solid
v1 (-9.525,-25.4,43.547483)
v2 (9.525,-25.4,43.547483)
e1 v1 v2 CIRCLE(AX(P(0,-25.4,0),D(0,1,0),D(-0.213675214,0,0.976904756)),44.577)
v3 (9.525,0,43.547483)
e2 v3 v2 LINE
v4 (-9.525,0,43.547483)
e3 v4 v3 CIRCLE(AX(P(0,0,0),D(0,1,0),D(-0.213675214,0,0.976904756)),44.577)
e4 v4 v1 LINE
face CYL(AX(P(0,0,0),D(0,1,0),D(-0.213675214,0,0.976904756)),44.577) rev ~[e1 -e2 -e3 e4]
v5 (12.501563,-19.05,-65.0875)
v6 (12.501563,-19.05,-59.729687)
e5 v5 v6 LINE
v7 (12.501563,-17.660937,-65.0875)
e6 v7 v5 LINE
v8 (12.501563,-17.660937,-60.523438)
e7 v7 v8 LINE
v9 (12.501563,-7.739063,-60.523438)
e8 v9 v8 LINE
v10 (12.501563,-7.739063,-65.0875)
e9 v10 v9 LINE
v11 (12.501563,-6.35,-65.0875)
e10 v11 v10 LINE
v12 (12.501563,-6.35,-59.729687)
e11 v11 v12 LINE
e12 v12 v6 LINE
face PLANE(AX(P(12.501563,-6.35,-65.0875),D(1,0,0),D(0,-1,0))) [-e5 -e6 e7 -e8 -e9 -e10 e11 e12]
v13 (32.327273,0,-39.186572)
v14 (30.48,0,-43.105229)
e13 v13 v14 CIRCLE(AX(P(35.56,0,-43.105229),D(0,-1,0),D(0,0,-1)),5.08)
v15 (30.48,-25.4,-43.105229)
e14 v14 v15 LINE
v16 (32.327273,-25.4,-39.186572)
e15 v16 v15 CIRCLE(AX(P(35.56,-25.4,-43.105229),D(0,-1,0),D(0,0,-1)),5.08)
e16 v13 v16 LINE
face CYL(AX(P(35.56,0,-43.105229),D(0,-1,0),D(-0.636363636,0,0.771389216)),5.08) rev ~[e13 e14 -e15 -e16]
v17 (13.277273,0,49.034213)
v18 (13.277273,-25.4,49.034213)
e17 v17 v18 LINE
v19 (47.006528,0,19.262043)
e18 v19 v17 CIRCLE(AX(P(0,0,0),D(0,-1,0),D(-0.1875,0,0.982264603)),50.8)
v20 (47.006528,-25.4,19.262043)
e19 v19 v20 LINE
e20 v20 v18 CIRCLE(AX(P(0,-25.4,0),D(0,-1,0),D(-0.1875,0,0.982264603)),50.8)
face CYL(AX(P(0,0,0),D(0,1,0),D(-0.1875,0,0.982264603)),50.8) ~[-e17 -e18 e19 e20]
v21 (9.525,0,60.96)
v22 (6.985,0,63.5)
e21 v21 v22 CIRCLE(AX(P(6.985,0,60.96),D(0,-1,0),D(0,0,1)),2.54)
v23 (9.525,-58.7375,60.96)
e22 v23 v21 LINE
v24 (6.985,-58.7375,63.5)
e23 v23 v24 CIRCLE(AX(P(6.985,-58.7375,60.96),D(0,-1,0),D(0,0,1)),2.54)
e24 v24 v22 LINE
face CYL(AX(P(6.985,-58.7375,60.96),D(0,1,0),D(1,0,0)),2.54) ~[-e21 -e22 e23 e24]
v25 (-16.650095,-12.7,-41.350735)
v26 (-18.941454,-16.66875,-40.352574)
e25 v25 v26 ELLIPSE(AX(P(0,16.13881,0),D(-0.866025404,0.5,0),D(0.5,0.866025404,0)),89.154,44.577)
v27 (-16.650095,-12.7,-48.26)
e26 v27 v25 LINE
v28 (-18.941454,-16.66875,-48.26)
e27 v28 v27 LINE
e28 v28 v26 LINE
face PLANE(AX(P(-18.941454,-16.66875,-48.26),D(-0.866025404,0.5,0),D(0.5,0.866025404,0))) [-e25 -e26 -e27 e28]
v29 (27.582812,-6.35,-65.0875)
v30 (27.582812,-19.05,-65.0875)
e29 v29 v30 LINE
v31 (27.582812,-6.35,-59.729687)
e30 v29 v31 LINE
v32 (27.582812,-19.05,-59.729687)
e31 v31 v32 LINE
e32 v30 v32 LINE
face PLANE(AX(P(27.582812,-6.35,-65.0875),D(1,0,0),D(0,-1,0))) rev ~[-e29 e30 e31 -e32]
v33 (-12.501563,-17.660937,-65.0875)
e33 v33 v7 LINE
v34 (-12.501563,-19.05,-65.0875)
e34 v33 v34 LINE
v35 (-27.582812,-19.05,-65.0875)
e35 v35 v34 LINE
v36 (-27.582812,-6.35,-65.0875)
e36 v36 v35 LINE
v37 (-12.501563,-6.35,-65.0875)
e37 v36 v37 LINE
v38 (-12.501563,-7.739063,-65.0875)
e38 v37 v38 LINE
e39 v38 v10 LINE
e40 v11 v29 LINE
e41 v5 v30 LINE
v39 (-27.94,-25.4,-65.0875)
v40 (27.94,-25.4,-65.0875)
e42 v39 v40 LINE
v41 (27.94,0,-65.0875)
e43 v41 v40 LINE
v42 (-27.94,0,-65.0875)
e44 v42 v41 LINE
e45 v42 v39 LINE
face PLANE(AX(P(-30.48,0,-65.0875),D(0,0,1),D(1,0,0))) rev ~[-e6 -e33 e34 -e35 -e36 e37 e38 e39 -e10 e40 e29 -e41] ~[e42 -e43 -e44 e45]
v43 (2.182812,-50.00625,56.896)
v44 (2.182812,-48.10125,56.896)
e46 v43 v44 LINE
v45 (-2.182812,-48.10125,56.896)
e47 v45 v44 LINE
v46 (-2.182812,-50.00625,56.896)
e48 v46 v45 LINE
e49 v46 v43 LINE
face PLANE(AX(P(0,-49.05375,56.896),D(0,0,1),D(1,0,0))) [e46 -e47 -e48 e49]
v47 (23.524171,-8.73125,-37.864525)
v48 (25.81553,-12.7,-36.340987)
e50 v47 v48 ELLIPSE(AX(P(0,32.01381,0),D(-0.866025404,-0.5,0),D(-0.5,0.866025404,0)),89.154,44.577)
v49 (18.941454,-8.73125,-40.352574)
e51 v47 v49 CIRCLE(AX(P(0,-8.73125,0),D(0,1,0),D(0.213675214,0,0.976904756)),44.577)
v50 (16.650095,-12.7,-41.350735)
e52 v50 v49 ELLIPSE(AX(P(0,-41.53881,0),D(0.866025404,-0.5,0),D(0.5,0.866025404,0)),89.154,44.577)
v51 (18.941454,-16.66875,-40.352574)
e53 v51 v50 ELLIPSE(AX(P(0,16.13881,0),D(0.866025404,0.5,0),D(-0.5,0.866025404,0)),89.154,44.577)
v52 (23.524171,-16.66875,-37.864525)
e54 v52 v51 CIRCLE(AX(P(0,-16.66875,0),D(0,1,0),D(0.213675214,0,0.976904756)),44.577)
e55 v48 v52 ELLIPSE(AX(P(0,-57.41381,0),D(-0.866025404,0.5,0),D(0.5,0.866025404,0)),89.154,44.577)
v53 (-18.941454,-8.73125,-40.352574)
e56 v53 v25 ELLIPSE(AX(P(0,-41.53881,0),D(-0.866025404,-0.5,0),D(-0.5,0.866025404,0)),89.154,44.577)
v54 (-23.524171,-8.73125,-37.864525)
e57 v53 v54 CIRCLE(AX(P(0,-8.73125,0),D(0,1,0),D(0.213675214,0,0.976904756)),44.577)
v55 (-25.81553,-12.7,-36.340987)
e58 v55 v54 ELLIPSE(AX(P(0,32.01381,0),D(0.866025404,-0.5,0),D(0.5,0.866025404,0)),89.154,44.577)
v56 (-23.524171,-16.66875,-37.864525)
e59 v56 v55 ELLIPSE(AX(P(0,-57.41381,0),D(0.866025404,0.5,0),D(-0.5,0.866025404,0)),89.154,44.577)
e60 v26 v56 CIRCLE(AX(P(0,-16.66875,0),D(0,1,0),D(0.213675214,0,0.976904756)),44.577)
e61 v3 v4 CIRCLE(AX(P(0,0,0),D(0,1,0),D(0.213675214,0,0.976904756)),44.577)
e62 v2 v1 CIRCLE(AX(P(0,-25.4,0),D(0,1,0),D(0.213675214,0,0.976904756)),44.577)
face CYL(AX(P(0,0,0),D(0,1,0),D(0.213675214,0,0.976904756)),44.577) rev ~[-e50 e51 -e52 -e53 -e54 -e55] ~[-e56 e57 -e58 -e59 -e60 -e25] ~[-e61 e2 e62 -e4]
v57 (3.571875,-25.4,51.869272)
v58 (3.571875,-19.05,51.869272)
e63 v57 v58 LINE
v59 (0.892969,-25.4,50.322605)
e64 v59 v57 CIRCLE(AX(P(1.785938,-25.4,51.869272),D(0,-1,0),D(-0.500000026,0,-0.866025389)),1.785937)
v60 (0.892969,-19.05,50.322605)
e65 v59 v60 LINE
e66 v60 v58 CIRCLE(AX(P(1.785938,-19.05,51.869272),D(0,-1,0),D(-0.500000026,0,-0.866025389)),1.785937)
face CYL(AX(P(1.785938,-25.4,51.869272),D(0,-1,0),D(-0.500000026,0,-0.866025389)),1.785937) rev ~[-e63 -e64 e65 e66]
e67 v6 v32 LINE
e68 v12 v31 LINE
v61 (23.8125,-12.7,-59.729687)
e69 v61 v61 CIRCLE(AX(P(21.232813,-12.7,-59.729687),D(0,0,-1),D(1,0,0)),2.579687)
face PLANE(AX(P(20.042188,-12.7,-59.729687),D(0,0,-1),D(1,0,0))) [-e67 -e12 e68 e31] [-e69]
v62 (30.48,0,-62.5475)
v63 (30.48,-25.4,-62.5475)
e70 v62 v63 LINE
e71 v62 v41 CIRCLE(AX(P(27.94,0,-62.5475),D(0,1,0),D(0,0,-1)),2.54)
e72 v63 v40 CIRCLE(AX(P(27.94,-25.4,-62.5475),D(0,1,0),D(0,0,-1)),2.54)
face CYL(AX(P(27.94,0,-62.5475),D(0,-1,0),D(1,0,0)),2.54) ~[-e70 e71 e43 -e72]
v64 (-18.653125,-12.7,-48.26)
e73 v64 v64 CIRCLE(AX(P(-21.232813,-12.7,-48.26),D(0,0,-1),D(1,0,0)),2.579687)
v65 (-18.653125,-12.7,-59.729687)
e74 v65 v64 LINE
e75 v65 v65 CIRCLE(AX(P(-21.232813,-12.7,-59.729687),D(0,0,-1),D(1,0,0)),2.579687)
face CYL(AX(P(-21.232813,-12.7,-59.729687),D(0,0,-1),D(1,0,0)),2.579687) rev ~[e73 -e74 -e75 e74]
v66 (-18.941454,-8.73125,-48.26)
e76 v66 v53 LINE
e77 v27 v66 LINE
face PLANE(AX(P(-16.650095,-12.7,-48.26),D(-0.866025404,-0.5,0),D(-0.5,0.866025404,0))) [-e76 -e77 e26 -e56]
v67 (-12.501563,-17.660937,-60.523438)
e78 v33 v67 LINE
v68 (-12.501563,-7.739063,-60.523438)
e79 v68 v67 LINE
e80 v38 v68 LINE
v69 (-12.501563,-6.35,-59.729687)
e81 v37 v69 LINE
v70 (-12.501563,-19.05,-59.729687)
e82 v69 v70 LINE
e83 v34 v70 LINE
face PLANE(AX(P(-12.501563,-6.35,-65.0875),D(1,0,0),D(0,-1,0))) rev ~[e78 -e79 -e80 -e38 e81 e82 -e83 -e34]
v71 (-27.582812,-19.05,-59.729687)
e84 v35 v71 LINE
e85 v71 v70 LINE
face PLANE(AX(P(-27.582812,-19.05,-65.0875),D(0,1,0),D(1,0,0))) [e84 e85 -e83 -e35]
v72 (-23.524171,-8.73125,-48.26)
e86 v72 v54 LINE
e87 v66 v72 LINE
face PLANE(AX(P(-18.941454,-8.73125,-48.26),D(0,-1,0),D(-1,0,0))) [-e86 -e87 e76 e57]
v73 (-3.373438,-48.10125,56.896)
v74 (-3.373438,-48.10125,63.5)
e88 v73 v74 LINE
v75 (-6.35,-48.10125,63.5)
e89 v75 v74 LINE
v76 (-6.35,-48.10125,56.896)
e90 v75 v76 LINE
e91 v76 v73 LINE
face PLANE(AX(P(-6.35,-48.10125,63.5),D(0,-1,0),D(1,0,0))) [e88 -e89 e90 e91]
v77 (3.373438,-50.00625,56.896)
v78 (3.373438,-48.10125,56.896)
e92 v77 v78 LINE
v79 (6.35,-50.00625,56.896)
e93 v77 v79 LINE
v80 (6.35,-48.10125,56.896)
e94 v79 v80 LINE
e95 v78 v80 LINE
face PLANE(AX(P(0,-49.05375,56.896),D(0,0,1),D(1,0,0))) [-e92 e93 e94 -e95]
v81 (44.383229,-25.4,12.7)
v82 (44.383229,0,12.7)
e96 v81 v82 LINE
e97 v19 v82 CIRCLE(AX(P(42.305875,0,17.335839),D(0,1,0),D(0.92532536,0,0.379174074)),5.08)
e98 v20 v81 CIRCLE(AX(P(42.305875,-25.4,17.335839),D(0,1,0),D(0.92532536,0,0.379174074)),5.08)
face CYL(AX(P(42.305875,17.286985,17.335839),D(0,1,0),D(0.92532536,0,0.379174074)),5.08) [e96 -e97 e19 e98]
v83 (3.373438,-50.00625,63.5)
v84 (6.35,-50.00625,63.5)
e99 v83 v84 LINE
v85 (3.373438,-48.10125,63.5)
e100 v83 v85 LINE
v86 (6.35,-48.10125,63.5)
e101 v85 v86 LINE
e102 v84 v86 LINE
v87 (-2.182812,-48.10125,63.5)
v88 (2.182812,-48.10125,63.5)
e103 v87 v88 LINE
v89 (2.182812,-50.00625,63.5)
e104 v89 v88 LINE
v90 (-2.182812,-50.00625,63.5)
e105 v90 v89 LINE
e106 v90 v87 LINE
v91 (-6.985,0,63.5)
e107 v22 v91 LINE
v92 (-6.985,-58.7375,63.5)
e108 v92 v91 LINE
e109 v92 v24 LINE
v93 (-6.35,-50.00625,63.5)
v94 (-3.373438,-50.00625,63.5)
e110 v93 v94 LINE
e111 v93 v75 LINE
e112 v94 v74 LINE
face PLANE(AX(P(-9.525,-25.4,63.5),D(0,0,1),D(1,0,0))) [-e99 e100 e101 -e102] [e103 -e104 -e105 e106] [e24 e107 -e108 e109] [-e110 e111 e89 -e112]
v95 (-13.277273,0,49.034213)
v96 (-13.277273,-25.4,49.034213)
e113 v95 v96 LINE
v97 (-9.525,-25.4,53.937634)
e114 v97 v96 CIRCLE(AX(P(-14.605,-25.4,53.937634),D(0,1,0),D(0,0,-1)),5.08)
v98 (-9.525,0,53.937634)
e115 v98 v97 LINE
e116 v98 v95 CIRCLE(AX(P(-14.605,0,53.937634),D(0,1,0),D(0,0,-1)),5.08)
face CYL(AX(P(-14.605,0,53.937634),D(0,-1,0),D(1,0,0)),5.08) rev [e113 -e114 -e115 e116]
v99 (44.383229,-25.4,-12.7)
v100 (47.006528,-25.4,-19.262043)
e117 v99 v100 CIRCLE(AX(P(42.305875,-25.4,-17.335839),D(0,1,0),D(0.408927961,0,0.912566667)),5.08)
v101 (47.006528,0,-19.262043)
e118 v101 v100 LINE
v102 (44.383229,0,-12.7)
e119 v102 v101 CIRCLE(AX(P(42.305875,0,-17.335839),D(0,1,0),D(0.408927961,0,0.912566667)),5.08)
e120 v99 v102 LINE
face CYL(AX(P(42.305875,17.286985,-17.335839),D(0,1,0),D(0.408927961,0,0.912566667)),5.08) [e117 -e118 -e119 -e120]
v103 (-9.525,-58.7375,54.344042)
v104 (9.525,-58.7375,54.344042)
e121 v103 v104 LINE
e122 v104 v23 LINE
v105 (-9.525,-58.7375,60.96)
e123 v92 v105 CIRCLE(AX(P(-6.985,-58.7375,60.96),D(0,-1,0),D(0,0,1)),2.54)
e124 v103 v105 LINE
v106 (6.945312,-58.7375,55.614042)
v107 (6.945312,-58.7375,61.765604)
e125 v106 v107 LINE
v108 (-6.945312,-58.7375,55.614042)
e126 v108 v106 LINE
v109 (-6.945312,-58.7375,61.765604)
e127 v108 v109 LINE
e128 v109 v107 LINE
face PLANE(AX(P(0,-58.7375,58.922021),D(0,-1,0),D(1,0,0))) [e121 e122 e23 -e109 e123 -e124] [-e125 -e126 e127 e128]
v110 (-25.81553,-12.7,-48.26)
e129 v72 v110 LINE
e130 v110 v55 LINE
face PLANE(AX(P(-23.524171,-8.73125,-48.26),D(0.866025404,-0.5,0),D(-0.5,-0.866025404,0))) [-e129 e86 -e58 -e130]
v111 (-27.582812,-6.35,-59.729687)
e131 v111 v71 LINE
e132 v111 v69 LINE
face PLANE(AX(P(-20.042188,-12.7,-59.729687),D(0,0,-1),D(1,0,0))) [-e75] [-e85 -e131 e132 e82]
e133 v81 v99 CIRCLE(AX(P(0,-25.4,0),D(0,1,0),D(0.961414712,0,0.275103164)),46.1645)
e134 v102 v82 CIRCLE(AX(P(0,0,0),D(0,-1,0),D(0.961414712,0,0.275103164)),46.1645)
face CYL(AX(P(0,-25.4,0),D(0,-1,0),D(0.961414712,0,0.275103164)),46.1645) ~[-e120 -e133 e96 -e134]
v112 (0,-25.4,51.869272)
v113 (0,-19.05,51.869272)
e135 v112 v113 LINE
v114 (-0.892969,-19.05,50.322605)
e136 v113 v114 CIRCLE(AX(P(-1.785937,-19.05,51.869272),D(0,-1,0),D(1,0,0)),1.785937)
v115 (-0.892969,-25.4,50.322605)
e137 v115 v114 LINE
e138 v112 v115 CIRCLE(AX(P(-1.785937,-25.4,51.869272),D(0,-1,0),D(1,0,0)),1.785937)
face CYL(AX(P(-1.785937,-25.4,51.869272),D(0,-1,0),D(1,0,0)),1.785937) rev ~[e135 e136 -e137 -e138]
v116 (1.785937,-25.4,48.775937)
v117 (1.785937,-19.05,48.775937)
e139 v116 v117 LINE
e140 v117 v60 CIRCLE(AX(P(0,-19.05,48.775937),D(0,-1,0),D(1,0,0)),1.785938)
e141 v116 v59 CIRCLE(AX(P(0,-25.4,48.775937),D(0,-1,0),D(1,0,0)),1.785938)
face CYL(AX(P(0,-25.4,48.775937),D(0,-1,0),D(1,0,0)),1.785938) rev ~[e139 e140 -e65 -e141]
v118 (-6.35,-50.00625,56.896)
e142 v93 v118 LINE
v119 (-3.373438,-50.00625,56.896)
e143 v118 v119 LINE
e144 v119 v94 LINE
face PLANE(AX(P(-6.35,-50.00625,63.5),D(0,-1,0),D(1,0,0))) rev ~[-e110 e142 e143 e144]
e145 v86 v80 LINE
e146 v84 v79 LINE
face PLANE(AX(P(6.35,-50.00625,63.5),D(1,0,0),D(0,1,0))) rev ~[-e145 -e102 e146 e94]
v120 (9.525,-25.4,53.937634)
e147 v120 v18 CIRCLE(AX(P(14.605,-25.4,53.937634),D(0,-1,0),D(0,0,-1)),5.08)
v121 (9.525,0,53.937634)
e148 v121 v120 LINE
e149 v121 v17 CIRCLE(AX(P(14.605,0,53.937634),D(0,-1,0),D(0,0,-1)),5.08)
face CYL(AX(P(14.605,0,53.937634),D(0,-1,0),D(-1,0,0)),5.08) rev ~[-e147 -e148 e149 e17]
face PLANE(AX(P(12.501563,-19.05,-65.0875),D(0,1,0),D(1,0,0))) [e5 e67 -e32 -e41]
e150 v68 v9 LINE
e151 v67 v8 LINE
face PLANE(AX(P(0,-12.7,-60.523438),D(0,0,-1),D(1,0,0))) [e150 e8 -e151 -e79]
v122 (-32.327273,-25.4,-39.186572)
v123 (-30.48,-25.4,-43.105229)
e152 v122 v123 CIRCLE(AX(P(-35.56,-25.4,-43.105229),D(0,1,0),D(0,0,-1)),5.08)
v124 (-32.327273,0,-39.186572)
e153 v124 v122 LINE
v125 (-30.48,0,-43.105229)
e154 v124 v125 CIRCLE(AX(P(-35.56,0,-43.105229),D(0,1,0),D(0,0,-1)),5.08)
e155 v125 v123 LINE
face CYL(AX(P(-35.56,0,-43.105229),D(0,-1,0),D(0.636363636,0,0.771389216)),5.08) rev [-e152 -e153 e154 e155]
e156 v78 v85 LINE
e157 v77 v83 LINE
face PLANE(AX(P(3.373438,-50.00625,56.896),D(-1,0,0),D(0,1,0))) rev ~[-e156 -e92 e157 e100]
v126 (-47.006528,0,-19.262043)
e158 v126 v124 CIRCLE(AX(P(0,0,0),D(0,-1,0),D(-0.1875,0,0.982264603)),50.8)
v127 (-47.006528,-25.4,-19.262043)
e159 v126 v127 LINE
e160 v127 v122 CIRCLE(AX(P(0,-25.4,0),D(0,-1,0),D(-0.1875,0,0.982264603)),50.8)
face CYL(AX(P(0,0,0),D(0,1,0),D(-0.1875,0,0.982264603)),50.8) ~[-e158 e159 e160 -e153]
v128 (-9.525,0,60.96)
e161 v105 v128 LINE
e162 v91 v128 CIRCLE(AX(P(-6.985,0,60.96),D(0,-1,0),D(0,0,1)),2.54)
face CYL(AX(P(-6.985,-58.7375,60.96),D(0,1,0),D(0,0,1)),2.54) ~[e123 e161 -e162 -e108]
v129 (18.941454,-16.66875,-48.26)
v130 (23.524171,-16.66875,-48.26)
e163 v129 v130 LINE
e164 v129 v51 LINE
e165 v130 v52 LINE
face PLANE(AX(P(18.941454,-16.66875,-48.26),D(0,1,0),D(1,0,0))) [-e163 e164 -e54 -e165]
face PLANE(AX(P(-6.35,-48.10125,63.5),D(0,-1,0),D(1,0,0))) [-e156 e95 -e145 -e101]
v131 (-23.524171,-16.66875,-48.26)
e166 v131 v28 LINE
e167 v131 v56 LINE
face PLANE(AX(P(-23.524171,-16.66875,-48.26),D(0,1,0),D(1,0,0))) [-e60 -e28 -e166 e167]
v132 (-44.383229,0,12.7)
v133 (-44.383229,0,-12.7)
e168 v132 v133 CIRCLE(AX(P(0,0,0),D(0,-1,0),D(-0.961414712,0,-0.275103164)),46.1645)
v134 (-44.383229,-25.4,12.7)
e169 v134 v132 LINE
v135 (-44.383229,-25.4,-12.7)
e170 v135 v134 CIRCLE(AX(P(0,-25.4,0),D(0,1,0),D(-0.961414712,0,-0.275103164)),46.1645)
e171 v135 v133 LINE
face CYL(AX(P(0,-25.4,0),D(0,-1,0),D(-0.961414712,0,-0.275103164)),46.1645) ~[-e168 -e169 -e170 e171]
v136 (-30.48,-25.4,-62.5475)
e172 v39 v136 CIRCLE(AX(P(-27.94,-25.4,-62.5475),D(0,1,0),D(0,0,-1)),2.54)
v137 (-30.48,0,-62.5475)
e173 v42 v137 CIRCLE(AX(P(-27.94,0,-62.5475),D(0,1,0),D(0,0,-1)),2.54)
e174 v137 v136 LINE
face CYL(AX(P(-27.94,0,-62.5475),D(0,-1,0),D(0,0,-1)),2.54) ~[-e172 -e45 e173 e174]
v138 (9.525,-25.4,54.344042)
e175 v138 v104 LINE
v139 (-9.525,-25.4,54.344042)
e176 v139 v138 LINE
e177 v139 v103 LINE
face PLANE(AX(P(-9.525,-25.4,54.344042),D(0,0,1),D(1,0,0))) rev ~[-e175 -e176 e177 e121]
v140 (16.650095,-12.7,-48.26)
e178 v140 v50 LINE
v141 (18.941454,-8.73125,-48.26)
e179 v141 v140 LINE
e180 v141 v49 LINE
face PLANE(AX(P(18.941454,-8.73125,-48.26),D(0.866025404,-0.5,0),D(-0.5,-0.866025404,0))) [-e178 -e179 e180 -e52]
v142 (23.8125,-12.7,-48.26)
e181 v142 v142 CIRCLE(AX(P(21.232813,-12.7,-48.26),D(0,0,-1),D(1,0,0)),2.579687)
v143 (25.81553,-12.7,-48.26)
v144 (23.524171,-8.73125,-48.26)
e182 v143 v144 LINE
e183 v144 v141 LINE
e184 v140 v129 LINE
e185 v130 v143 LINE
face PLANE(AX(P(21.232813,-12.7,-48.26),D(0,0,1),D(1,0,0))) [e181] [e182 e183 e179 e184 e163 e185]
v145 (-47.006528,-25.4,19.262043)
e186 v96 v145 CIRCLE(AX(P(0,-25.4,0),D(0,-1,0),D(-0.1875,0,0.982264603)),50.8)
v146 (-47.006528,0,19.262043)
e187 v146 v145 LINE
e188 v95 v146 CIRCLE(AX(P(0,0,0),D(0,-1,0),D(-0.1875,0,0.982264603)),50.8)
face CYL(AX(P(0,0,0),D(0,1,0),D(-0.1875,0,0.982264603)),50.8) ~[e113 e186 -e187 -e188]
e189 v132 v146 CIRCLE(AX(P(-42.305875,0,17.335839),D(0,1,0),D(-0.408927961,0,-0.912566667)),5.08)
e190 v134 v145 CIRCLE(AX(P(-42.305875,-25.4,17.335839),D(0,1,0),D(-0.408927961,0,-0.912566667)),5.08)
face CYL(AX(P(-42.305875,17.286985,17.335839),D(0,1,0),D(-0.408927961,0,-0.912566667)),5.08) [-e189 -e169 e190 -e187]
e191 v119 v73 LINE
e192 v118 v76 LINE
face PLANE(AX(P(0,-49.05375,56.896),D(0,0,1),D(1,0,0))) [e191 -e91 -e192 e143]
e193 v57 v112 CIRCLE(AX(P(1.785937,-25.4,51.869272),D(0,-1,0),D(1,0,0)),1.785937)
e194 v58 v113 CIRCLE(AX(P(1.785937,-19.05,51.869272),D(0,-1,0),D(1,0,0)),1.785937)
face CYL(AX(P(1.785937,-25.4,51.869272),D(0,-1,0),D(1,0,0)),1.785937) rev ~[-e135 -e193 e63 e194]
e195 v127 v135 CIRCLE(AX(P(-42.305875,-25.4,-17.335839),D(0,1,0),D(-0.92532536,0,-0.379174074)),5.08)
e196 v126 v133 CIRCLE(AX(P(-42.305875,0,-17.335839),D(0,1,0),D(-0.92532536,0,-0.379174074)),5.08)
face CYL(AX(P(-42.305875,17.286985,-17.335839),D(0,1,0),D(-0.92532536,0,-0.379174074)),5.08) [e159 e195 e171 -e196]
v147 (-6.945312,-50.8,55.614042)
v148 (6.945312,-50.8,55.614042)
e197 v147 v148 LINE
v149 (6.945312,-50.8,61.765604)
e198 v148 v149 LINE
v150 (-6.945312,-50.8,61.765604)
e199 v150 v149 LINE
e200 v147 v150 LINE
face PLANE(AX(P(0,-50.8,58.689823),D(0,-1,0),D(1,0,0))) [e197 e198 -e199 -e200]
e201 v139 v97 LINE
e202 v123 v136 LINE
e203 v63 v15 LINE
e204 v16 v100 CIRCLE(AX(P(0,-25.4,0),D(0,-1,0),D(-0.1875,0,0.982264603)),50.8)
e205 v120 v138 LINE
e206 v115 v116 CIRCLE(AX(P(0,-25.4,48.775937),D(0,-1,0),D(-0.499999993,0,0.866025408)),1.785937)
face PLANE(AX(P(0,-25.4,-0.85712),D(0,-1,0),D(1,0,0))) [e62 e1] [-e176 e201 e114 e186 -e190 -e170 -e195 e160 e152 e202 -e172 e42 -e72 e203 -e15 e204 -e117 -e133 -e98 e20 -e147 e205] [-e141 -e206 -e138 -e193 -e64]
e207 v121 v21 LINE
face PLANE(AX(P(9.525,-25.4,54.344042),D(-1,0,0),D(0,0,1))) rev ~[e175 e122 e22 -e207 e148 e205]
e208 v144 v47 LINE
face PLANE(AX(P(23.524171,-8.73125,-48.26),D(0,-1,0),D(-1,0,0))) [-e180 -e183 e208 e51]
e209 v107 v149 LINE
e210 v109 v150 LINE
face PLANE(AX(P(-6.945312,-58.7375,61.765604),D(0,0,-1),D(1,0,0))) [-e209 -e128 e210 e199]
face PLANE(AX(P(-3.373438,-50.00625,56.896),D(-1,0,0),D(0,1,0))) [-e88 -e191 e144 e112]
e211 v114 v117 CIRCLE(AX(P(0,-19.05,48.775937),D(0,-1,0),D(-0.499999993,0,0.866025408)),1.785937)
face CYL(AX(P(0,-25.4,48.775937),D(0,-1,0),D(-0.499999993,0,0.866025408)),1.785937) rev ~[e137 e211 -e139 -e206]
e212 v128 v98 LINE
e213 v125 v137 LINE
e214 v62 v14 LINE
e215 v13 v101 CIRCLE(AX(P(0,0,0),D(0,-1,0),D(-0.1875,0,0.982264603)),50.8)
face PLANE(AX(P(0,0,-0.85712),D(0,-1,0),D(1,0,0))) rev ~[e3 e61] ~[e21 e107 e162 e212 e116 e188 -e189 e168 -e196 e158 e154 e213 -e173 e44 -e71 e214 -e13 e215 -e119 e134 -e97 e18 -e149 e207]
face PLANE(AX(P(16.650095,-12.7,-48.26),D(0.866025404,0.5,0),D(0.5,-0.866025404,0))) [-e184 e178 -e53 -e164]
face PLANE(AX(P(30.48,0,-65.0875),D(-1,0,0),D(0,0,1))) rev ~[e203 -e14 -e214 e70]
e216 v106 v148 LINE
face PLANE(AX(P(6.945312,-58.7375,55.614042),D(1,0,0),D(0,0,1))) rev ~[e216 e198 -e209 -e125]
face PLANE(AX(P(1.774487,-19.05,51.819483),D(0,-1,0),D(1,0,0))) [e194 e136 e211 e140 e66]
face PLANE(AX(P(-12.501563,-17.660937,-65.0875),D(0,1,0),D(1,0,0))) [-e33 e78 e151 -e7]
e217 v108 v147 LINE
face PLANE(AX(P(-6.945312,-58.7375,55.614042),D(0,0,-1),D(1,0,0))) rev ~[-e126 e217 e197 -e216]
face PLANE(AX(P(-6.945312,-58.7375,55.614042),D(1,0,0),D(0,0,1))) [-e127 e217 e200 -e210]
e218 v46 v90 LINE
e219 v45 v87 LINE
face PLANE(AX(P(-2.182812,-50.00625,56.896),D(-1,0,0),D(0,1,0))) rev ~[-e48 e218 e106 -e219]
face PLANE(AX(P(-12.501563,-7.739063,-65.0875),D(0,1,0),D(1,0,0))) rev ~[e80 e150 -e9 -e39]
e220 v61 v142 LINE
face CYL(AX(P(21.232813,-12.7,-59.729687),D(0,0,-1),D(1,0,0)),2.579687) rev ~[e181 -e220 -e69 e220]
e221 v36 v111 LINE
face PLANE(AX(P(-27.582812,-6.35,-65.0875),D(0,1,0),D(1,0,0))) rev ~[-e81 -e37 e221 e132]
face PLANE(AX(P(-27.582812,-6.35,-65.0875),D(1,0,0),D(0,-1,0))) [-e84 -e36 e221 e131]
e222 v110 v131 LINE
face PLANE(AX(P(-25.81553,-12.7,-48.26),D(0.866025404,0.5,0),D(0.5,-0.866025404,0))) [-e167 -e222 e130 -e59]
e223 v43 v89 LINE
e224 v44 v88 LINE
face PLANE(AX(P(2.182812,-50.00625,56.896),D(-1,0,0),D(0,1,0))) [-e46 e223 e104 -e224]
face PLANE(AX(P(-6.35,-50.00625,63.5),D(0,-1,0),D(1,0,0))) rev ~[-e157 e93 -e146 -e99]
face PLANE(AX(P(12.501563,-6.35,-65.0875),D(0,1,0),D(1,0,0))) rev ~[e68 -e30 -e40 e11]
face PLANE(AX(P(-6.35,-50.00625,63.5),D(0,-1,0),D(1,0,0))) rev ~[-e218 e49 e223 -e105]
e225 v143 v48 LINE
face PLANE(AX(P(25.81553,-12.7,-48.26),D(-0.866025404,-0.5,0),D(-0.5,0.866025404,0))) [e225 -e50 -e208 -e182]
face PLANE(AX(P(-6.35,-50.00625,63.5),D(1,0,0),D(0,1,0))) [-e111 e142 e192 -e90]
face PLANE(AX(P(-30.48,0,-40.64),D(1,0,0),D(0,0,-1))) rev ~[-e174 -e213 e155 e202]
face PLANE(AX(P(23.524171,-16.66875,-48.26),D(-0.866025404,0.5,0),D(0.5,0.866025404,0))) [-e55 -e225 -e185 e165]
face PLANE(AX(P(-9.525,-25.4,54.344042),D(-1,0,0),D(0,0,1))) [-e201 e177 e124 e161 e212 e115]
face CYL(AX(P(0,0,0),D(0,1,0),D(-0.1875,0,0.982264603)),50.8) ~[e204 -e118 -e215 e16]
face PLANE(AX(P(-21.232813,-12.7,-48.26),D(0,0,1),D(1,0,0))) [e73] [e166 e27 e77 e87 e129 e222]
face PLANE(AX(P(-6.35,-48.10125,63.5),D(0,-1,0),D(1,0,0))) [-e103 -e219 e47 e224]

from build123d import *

# Parameters (mm, degrees)
F1_DEPTH     = 25.4
F3_DEPTH     = 6.35
F5_DEPTH     = 25.4
F6_W         = 15.08125
F6_H         = 12.7
F7_DEPTH     = 5.3578125
F8_R         = 2.5796875
F9_DEPTH     = 25.4
F12_DEPTH    = 25.4
F13_W        = 19.05
F13_H        = 9.1559581755
F14_DEPTH    = 33.3375
F15_W        = 13.890625
F15_H        = 6.1515625
F16_DEPTH    = 7.9375
F17_W        = 12.7
F17_H        = 1.905
F18_DEPTH    = 6.604
F19_W        = 1.190625
F19_H        = 1.905
F20_DEPTH    = 6.604
F21_W        = 25.003125
F21_H        = 9.921875
F22_DEPTH    = 4.5640625
F24_DEPTH    = 27.94
F25_T1_DEPTH = 59.9739709134
F26_R        = 2.54
F27_R        = 2.54
F28_R        = 5.08


# Not quite as in the source:
# - a fillet or chamfer that OpenCascade refuses, or shapes differently, is made with other operations: its cross-section is extruded or revolved along the edge and cut away or added


with BuildPart() as f1:
    # F0 (on Front) → F1 (new body)
    with BuildSketch(Plane.XZ):
        with BuildLine():
            ThreePointArc((9.525, 43.5474833257), (34.7253859158, 27.9509660298), (44.577, 0))
            ThreePointArc((44.577, 0), (-27.9509660298, -34.7253859158), (-9.525, 43.5474833257))
            Line((-9.525, 43.5474833257), (-9.525, 49.8990418245))
            ThreePointArc((-9.525, 49.8990418245), (-32.3787739113, -39.1440289189), (50.8, 0))
            ThreePointArc((50.8, 0), (39.1440289189, 32.3787739113), (9.525, 49.8990418245))
            Line((9.525, 49.8990418245), (9.525, 43.5474833257))
        make_face()
        with BuildLine():
            ThreePointArc((-9.525, 43.5474833257), (0, 44.577), (9.525, 43.5474833257))
            Line((9.525, 43.5474833257), (9.525, 49.8990418245))
            ThreePointArc((9.525, 49.8990418245), (0, 50.8), (-9.525, 49.8990418245))
            Line((-9.525, 49.8990418245), (-9.525, 43.5474833257))
        make_face()
        with BuildLine():
            ThreePointArc((-9.525, 49.8990418245), (0, 50.8), (9.525, 49.8990418245))
            Line((9.525, 49.8990418245), (9.525, 63.5))
            Line((9.525, 63.5), (-9.525, 63.5))
            Line((-9.525, 63.5), (-9.525, 49.8990418245))
        make_face()
    extrude(amount=F1_DEPTH)

    # F2 (on face) → F3 (cut)
    with BuildSketch(Plane.XZ.offset(25.4)):
        with BuildLine():
            ThreePointArc((0.8929687032, 50.3226047716), (2.6789062266, 50.322604731), (3.571875, 51.8692719891))
            ThreePointArc((3.571875, 51.8692719891), (1.7859375, 53.6552094891), (0, 51.8692719891))
            ThreePointArc((0, 51.8692719891), (0.2392702419, 50.9763032626), (0.8929687032, 50.3226047716))
        make_face()
        with BuildLine():
            ThreePointArc((-0.8929687383, 50.3226047513), (-0.2392702521, 50.976303245), (0, 51.8692719891))
            ThreePointArc((0, 51.8692719891), (-3.3326047479, 52.7622407333), (-0.8929687383, 50.3226047513))
        make_face()
        with BuildLine():
            ThreePointArc((0.8929687032, 50.3226047716), (0.2392702419, 50.9763032626), (0, 51.8692719891))
            ThreePointArc((0, 51.8692719891), (-0.2392702521, 50.976303245), (-0.8929687383, 50.3226047513))
            ThreePointArc((-0.8929687383, 50.3226047513), (-2.03e-08, 50.561875), (0.8929687032, 50.3226047716))
        make_face()
        with BuildLine():
            ThreePointArc((1.7859375, 48.7759375), (1.546667231, 49.6689062734), (0.8929687032, 50.3226047716))
            ThreePointArc((0.8929687032, 50.3226047716), (-2.03e-08, 50.561875), (-0.8929687383, 50.3226047513))
            ThreePointArc((-0.8929687383, 50.3226047513), (-0.8929687558, 47.2292702588), (1.7859375, 48.7759375))
        make_face()
    extrude(amount=-F3_DEPTH, mode=Mode.SUBTRACT)

    # F4 (on Front) → F5 (join)
    with BuildSketch(Plane.XZ):
        with BuildLine():
            Line((-30.48, -65.0875), (30.48, -65.0875))
            Line((30.48, -65.0875), (30.48, -40.64))
            ThreePointArc((30.48, -40.64), (0, -50.8), (-30.48, -40.64))
            Line((-30.48, -40.64), (-30.48, -65.0875))
        make_face()
    extrude(amount=F5_DEPTH)

    # F6 (on face) → F7 (cut)
    with BuildSketch(Plane(origin=(0, 0, -65.0875), x_dir=(1, 0, 0), z_dir=(0, 0, -1))):
        with Locations((20.0421875, 12.7)):
            Rectangle(F6_W, F6_H)
        with Locations((-20.0421875, 12.7)):
            Rectangle(F6_W, F6_H)
    extrude(amount=-F7_DEPTH, mode=Mode.SUBTRACT)

    # F8 (on face) → F9 (cut)
    with BuildSketch(Plane(origin=(0, 0, -59.7296875), x_dir=(1, 0, 0), z_dir=(0, 0, -1))):
        with Locations((21.2328125, 12.7)):
            Circle(F8_R)
        with Locations((-21.2328125, 12.7)):
            Circle(F8_R)
    extrude(amount=-F9_DEPTH, mode=Mode.SUBTRACT)

    # F11 (on offset) → F12 (cut)
    with BuildSketch(Plane.XY.offset(-48.26)):
        Polygon((18.9414536192, -16.66875), (23.5241713808, -16.66875), (25.8155302617, -12.7), (23.5241713808, -8.73125), (18.9414536192, -8.73125), (16.6500947383, -12.7), align=None)
        Polygon((-25.8155302617, -12.7), (-23.5241713808, -16.66875), (-18.9414536192, -16.66875), (-16.6500947383, -12.7), (-18.9414536192, -8.73125), (-23.5241713808, -8.73125), align=None)
    extrude(amount=F12_DEPTH, mode=Mode.SUBTRACT)

    # F13 (on face) → F14 (join)
    with BuildSketch(Plane.XZ.offset(25.4)):
        with Locations((0, 58.9220209122)):
            Rectangle(F13_W, F13_H)
    extrude(amount=F14_DEPTH)

    # F15 (on face) → F16 (cut)
    with BuildSketch(Plane.XZ.offset(58.7375)):
        with Locations((0, 58.6898230745)):
            Rectangle(F15_W, F15_H)
    extrude(amount=-F16_DEPTH, mode=Mode.SUBTRACT)

    # F17 (on face) → F18 (cut)
    with BuildSketch(Plane.XY.offset(63.5)):
        with Locations((0, -49.05375)):
            Rectangle(F17_W, F17_H)
    extrude(amount=-F18_DEPTH, mode=Mode.SUBTRACT)

    # F19 (on face) → F20 (join)
    with BuildSketch(Plane.XY.offset(56.896)):
        with Locations((-2.778125, -49.05375)):
            Rectangle(F19_W, F19_H)
        with Locations((2.778125, -49.05375)):
            Rectangle(F19_W, F19_H)
    extrude(amount=F20_DEPTH)

    # F21 (on face) → F22 (cut)
    with BuildSketch(Plane(origin=(0, 0, -65.0875), x_dir=(1, 0, 0), z_dir=(0, 0, -1))):
        with Locations((0, 12.7)):
            Rectangle(F21_W, F21_H)
    extrude(amount=-F22_DEPTH, mode=Mode.SUBTRACT)

    # F23 (on face) → F24 (cut)
    with BuildSketch(Plane.XZ.offset(25.4)):
        with BuildLine():
            ThreePointArc((44.3832294932, 12.7), (46.1645, 0), (44.3832294932, -12.7))
            Line((44.3832294932, -12.7), (55.8275170624, -12.7))
            Line((55.8275170624, -12.7), (55.8275170624, 12.7))
            Line((55.8275170624, 12.7), (44.3832294932, 12.7))
        make_face()
        with BuildLine():
            Line((-44.3832294932, 12.7), (-55.6385964155, 12.7))
            Line((-55.6385964155, 12.7), (-55.6385964155, -12.7))
            Line((-55.6385964155, -12.7), (-44.3832294932, -12.7))
            ThreePointArc((-44.3832294932, -12.7), (-46.1645, 0), (-44.3832294932, 12.7))
        make_face()
    extrude(amount=-F24_DEPTH, mode=Mode.SUBTRACT)

    # F25: fillet of radius 5.08 on 4 edges, made by hand

    # F25_s2 → F25_t1 (cut)
    with BuildSketch(Plane.XZ.offset(-17.2869854567)):
        with BuildLine():
            ThreePointArc((-44.3832294932, 12.7), (-47.0229133194, 15.4501150062), (-47.0065282778, 19.2620429672))
            Line((-47.0065282778, 19.2620429672), (-47.1005413343, 19.3005670532))
            ThreePointArc((-47.1005413343, 19.3005670532), (-48.3049064769, 16.050199152), (-49.2852622738, 12.7254))
            Line((-49.2852622738, 12.7254), (-49.1868884968, 12.5984))
            ThreePointArc((-49.1868884968, 12.5984), (-46.785058995, 12.5984), (-44.4247765741, 12.6072832266))
            Line((-44.4247765741, 12.6072832266), (-44.3832294932, 12.7))
        make_face()
        with BuildLine():
            ThreePointArc((-47.0065282778, -19.2620429672), (-47.0229133194, -15.4501150062), (-44.3832294932, -12.7))
            Line((-44.3832294932, -12.7), (-44.4247765741, -12.6072832266))
            ThreePointArc((-44.4247765741, -12.6072832266), (-46.785058995, -12.5984), (-49.1868884968, -12.5984))
            Line((-49.1868884968, -12.5984), (-49.2852622738, -12.7254))
            ThreePointArc((-49.2852622738, -12.7254), (-48.3049064769, -16.050199152), (-47.1005413343, -19.3005670532))
            Line((-47.1005413343, -19.3005670532), (-47.0065282778, -19.2620429672))
        make_face()
        with BuildLine():
            ThreePointArc((44.3832294932, -12.7), (47.0229133194, -15.4501150062), (47.0065282778, -19.2620429672))
            Line((47.0065282778, -19.2620429672), (47.1005413343, -19.3005670532))
            ThreePointArc((47.1005413343, -19.3005670532), (48.3049064769, -16.050199152), (49.2852622738, -12.7254))
            Line((49.2852622738, -12.7254), (49.1868884968, -12.5984))
            ThreePointArc((49.1868884968, -12.5984), (46.785058995, -12.5984), (44.4247765741, -12.6072832266))
            Line((44.4247765741, -12.6072832266), (44.3832294932, -12.7))
        make_face()
        with BuildLine():
            ThreePointArc((47.0065282778, 19.2620429672), (47.0229133194, 15.4501150062), (44.3832294932, 12.7))
            Line((44.3832294932, 12.7), (44.4247765741, 12.6072832266))
            ThreePointArc((44.4247765741, 12.6072832266), (46.785058995, 12.5984), (49.1868884968, 12.5984))
            Line((49.1868884968, 12.5984), (49.2852622738, 12.7254))
            ThreePointArc((49.2852622738, 12.7254), (48.3049064769, 16.050199152), (47.1005413343, 19.3005670532))
            Line((47.1005413343, 19.3005670532), (47.0065282778, 19.2620429672))
        make_face()
    extrude(amount=F25_T1_DEPTH, mode=Mode.SUBTRACT)

    # F26
    f26_edges = [f1.edges().sort_by_distance(p)[0] for p in [
        (30.48, -12.7, -65.0875),
        (-30.48, -12.7, -65.0875),
    ]]
    fillet(f26_edges, radius=F26_R)

    # F27
    f27_edges = [f1.edges().sort_by_distance(p)[0] for p in [
        (9.525, -29.36875, 63.5),
        (-9.525, -29.36875, 63.5),
    ]]
    fillet(f27_edges, radius=F27_R)

    # F28
    f28_edges = [f1.edges().sort_by_distance(p)[0] for p in [
        (30.48, -12.7, -40.64),
        (-30.48, -12.7, -40.64),
        (-9.525, -12.7, 49.899042),
        (9.525, -12.7, 49.899042),
    ]]
    fillet(f28_edges, radius=F28_R)


solid = f1.part
